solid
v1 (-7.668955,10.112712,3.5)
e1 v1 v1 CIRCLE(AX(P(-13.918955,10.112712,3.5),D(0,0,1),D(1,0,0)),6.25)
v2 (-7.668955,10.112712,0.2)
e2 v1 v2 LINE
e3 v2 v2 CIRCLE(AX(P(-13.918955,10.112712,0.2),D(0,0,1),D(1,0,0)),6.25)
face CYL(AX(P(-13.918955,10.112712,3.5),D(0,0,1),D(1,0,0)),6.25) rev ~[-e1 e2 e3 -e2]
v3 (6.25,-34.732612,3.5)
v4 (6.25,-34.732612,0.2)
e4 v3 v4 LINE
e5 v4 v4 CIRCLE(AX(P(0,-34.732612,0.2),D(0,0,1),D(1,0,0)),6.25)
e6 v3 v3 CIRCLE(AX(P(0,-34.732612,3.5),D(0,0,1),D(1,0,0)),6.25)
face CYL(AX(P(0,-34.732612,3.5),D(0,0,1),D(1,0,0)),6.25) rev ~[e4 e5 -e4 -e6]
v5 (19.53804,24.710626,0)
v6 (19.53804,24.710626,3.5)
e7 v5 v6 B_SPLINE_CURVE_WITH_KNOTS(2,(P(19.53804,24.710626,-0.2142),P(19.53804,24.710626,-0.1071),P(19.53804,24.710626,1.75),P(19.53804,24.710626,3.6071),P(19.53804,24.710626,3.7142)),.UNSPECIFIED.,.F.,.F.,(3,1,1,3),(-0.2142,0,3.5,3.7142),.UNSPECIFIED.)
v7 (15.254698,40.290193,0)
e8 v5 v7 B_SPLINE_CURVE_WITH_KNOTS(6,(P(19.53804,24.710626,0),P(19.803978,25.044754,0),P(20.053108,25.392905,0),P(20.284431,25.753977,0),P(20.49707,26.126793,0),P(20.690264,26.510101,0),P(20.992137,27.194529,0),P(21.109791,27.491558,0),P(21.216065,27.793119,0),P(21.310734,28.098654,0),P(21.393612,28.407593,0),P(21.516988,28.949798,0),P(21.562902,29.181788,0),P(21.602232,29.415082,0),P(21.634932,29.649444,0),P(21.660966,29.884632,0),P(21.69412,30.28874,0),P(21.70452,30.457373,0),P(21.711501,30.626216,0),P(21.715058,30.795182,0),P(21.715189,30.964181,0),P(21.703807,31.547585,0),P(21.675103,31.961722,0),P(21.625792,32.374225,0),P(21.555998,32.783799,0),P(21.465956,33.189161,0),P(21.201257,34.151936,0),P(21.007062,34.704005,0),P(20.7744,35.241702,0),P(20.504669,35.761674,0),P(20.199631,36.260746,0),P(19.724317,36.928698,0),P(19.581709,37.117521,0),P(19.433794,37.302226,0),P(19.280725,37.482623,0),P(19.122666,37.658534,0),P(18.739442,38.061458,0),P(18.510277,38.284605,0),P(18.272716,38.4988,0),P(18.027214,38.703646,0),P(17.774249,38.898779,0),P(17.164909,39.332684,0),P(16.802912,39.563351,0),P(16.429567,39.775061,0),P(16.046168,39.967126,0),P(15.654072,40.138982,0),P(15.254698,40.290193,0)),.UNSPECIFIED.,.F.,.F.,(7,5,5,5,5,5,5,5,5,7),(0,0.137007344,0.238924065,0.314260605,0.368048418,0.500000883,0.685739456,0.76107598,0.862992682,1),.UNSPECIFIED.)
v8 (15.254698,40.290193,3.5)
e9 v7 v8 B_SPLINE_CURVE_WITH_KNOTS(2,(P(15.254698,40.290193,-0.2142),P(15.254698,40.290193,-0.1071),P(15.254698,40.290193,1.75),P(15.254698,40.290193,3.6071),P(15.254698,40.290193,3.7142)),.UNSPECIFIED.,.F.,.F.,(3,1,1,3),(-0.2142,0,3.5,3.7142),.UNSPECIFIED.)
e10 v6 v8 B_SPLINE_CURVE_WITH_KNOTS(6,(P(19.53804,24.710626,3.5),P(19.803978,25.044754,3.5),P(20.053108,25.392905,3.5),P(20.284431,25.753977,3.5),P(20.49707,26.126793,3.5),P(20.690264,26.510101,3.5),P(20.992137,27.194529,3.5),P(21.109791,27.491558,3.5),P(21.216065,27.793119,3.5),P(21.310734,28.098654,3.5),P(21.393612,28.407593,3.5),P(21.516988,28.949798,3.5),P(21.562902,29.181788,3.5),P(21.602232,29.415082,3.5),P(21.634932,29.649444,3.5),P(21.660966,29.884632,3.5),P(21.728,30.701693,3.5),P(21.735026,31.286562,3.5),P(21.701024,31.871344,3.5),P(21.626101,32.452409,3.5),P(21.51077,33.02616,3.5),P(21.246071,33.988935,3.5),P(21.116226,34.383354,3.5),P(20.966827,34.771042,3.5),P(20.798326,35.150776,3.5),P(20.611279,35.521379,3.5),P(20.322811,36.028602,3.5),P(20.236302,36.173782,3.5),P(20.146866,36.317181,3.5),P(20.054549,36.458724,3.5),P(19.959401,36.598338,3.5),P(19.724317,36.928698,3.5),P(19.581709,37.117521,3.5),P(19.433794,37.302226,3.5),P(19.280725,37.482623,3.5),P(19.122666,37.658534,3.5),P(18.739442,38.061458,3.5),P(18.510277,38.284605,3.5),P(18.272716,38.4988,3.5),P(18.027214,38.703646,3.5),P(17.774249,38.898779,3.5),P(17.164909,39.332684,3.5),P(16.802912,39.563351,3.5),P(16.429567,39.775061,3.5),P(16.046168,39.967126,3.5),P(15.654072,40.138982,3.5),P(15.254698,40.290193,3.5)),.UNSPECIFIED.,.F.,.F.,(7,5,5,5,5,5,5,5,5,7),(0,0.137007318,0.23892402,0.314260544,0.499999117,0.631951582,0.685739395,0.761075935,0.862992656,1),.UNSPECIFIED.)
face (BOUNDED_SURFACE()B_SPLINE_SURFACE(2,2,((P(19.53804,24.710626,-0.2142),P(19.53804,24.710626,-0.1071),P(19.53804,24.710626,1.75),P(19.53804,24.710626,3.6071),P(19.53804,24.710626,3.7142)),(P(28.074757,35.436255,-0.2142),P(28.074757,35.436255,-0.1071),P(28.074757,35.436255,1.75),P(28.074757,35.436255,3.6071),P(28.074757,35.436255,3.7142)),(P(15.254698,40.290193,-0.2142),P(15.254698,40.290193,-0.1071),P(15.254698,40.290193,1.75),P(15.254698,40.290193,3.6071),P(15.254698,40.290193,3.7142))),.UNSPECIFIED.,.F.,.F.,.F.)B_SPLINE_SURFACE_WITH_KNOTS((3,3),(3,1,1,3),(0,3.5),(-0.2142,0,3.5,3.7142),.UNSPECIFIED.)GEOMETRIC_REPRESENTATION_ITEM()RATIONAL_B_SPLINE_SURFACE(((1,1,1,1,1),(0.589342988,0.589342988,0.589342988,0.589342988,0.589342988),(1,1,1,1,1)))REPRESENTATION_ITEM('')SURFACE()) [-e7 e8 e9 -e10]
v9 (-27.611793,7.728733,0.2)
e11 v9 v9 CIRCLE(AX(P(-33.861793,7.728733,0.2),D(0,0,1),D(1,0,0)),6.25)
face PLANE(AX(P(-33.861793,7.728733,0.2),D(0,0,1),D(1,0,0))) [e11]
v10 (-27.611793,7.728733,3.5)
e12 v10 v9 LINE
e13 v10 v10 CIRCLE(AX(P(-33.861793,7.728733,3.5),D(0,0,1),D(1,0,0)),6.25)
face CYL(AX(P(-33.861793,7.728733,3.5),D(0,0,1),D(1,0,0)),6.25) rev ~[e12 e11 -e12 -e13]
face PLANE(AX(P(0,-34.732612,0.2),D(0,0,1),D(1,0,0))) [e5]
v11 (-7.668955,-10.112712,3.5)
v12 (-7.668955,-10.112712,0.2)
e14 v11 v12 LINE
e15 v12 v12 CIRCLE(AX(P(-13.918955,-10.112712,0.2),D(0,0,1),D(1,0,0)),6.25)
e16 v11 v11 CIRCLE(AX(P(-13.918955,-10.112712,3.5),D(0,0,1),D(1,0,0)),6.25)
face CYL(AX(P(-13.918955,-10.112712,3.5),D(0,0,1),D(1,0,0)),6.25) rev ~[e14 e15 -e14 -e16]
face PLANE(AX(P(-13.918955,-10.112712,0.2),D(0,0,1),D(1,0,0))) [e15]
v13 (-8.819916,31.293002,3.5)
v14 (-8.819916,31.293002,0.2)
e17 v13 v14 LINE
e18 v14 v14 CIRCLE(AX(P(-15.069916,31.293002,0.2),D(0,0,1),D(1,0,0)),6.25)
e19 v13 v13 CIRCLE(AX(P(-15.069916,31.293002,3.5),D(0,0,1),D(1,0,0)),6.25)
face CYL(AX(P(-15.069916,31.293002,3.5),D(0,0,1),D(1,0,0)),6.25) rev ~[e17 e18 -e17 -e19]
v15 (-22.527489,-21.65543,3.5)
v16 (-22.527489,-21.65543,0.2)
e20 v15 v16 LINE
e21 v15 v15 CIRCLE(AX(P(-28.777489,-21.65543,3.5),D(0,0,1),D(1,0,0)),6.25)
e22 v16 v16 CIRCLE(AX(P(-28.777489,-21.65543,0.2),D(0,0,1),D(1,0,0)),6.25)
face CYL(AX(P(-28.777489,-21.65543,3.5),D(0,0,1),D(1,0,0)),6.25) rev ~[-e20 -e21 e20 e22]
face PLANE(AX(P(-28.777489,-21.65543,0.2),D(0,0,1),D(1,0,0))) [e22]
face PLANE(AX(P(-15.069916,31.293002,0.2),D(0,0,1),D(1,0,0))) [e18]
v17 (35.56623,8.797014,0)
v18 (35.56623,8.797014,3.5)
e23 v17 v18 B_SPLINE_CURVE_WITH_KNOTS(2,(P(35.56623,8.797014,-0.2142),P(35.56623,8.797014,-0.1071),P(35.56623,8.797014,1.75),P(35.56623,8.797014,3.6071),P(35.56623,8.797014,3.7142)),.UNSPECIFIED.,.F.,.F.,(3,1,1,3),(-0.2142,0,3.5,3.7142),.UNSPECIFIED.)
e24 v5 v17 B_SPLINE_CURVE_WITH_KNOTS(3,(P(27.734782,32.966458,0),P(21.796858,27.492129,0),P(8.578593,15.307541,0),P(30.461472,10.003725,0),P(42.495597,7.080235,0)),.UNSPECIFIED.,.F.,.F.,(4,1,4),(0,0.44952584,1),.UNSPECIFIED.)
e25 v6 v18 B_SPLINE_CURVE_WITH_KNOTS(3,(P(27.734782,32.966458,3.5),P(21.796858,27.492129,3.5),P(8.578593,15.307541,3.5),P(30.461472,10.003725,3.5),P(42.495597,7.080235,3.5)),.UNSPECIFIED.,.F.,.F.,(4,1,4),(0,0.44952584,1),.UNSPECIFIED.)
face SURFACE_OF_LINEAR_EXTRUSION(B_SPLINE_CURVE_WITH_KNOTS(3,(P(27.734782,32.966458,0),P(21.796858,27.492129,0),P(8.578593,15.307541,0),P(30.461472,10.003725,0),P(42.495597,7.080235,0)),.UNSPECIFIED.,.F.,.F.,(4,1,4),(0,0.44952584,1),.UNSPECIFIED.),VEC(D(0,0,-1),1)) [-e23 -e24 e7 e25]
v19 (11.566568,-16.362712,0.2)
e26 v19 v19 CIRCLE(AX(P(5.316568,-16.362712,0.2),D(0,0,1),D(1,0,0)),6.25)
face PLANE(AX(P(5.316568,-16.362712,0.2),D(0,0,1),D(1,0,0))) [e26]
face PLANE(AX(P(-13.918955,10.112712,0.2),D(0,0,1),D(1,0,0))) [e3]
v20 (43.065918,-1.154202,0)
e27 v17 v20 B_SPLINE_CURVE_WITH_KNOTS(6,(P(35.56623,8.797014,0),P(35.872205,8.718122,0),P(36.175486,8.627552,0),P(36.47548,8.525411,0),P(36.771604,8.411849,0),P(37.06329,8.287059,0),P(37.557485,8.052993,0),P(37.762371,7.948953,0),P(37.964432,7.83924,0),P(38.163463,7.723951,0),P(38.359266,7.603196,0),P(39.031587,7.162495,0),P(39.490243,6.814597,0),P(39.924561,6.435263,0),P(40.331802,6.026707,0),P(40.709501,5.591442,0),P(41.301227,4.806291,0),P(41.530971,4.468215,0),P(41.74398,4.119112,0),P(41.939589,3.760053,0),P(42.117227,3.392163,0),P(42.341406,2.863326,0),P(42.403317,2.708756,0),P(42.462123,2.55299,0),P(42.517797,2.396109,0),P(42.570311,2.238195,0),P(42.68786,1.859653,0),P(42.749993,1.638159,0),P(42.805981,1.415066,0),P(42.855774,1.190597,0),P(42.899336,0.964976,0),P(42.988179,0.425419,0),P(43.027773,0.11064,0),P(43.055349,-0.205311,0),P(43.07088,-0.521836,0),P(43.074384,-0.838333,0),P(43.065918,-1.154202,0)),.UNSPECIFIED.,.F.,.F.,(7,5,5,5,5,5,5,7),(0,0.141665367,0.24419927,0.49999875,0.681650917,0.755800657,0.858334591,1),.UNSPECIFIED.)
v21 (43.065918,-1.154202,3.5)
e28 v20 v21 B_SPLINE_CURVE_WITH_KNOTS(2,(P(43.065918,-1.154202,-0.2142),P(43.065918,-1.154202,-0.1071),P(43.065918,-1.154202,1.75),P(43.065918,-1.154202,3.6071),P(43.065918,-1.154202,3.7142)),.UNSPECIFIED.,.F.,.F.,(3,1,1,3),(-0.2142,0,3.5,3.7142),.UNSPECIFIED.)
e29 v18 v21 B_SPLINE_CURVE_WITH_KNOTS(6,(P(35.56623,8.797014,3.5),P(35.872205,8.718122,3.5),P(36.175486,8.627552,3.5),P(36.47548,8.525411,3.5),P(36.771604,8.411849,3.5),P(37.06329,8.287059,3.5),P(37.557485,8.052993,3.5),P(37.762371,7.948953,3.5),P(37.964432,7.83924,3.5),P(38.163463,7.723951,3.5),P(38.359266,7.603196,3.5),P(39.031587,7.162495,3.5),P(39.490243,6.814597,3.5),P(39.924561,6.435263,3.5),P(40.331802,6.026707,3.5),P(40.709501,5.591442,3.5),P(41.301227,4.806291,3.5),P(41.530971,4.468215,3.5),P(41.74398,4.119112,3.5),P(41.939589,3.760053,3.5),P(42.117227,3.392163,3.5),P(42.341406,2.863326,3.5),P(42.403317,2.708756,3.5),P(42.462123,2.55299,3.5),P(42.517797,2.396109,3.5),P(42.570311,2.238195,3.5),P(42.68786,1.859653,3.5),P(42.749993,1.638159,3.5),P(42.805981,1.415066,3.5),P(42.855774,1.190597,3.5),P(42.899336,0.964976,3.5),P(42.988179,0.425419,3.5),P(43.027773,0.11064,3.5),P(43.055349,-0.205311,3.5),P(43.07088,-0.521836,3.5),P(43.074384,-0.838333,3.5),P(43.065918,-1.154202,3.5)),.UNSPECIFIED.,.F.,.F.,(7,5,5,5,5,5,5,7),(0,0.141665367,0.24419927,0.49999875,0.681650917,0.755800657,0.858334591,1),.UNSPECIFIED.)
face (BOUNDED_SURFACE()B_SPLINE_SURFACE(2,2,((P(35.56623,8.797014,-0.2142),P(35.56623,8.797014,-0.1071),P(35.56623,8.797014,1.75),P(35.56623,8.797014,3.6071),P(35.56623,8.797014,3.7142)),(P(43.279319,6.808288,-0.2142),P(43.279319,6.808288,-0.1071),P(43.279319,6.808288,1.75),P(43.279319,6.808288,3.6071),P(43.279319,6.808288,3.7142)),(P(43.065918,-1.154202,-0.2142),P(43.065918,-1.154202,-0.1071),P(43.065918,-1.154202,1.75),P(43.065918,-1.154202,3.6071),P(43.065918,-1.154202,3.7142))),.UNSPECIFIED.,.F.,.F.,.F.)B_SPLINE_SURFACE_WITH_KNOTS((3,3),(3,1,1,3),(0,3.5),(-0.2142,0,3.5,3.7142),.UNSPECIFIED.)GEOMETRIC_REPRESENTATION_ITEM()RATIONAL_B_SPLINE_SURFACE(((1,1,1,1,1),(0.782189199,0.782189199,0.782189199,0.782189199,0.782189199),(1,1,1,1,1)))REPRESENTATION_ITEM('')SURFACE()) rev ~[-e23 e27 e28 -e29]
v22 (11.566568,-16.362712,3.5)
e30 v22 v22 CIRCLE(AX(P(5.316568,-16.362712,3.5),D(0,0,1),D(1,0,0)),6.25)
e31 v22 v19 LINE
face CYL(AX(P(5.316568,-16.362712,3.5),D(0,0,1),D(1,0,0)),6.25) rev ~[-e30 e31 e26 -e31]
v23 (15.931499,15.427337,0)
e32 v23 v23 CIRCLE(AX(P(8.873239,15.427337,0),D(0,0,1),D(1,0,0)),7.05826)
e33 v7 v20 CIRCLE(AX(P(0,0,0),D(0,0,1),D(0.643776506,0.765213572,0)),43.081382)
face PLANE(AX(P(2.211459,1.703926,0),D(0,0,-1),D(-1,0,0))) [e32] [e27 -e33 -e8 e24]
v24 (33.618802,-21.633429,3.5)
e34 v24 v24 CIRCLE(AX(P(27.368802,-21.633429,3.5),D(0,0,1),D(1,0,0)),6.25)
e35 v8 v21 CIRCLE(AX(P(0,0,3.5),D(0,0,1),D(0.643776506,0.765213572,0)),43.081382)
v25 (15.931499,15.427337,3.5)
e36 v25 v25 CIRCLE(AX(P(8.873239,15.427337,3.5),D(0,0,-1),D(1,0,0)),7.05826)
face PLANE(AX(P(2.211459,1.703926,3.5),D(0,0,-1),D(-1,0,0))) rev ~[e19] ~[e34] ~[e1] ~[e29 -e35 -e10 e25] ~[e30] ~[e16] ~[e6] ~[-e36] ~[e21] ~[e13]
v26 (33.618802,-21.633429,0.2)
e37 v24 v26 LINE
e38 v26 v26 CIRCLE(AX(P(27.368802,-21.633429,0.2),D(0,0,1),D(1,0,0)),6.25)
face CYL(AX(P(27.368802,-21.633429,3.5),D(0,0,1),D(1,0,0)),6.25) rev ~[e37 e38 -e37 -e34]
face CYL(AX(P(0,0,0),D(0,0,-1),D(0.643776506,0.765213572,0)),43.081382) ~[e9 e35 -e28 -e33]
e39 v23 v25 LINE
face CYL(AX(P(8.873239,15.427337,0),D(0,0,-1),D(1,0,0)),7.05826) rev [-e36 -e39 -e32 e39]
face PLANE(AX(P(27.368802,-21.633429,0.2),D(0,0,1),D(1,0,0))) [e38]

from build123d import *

# Parameters (mm, degrees)
F1_DEPTH = 3.5
F2_R     = 7.058260031
F3_DEPTH = 25
F4_R     = 6.25
F5_DEPTH = 3.3
F6_R     = 6.25
F7_DEPTH = 3.3
F8_R     = 10


with BuildPart() as f1:
    # F0 (on Top) → F1 (new body)
    with BuildSketch(Plane.XY):
        with BuildLine():
            add(Edge.make_bspline(
                [(27.7347816335, 32.9664582942), (21.7968576271, 27.4921287364), (8.5785934713, 15.3075413902), (30.4614719911, 10.0037248917), (42.4955969964, 7.0802345045)],
                knots=[0, 0, 0, 0, 0.4495258402, 1, 1, 1, 1], degree=3))
            ThreePointArc((27.7347816335, 32.9664582942), (-37.424599746, -21.3402159917), (42.4955969964, 7.0802345045))
        make_face()
    extrude(amount=F1_DEPTH)

    # F2 (on Top) → F3 (cut)
    with BuildSketch(Plane.XY):
        with Locations((8.8732391596, 15.4273370281)):
            Circle(F2_R)
    extrude(amount=F3_DEPTH, mode=Mode.SUBTRACT)

    # F4 (on face) → F5 (cut)
    with BuildSketch(Plane.XY.offset(3.5)):
        with Locations((-15.0699157128, 31.2930024222)):
            Circle(F4_R)
        with Locations((-33.8617932364, 7.7287333374)):
            Circle(F4_R)
        with Locations((-28.7774891506, -21.6554295879)):
            Circle(F4_R)
        with Locations((0, -34.7326123432)):
            Circle(F4_R)
        with Locations((27.3688023133, -21.6334286339)):
            Circle(F4_R)
    extrude(amount=-F5_DEPTH, mode=Mode.SUBTRACT)

    # F6 (on face) → F7 (cut)
    with BuildSketch(Plane.XY.offset(3.5)):
        with Locations((-13.9189545551, -10.1127124297)):
            Circle(F6_R)
        with Locations((5.3165675522, -16.3627124297)):
            Circle(F6_R)
        with Locations((-13.9189545551, 10.1127124297)):
            Circle(F6_R)
    extrude(amount=-F7_DEPTH, mode=Mode.SUBTRACT)

    # F8
    f8_edges = [f1.edges().sort_by_distance(p)[0] for p in [
        (27.734782, 32.966458, 1.75),
        (42.495597, 7.080235, 1.75),
    ]]
    fillet(f8_edges, radius=F8_R)


solid = f1.part
